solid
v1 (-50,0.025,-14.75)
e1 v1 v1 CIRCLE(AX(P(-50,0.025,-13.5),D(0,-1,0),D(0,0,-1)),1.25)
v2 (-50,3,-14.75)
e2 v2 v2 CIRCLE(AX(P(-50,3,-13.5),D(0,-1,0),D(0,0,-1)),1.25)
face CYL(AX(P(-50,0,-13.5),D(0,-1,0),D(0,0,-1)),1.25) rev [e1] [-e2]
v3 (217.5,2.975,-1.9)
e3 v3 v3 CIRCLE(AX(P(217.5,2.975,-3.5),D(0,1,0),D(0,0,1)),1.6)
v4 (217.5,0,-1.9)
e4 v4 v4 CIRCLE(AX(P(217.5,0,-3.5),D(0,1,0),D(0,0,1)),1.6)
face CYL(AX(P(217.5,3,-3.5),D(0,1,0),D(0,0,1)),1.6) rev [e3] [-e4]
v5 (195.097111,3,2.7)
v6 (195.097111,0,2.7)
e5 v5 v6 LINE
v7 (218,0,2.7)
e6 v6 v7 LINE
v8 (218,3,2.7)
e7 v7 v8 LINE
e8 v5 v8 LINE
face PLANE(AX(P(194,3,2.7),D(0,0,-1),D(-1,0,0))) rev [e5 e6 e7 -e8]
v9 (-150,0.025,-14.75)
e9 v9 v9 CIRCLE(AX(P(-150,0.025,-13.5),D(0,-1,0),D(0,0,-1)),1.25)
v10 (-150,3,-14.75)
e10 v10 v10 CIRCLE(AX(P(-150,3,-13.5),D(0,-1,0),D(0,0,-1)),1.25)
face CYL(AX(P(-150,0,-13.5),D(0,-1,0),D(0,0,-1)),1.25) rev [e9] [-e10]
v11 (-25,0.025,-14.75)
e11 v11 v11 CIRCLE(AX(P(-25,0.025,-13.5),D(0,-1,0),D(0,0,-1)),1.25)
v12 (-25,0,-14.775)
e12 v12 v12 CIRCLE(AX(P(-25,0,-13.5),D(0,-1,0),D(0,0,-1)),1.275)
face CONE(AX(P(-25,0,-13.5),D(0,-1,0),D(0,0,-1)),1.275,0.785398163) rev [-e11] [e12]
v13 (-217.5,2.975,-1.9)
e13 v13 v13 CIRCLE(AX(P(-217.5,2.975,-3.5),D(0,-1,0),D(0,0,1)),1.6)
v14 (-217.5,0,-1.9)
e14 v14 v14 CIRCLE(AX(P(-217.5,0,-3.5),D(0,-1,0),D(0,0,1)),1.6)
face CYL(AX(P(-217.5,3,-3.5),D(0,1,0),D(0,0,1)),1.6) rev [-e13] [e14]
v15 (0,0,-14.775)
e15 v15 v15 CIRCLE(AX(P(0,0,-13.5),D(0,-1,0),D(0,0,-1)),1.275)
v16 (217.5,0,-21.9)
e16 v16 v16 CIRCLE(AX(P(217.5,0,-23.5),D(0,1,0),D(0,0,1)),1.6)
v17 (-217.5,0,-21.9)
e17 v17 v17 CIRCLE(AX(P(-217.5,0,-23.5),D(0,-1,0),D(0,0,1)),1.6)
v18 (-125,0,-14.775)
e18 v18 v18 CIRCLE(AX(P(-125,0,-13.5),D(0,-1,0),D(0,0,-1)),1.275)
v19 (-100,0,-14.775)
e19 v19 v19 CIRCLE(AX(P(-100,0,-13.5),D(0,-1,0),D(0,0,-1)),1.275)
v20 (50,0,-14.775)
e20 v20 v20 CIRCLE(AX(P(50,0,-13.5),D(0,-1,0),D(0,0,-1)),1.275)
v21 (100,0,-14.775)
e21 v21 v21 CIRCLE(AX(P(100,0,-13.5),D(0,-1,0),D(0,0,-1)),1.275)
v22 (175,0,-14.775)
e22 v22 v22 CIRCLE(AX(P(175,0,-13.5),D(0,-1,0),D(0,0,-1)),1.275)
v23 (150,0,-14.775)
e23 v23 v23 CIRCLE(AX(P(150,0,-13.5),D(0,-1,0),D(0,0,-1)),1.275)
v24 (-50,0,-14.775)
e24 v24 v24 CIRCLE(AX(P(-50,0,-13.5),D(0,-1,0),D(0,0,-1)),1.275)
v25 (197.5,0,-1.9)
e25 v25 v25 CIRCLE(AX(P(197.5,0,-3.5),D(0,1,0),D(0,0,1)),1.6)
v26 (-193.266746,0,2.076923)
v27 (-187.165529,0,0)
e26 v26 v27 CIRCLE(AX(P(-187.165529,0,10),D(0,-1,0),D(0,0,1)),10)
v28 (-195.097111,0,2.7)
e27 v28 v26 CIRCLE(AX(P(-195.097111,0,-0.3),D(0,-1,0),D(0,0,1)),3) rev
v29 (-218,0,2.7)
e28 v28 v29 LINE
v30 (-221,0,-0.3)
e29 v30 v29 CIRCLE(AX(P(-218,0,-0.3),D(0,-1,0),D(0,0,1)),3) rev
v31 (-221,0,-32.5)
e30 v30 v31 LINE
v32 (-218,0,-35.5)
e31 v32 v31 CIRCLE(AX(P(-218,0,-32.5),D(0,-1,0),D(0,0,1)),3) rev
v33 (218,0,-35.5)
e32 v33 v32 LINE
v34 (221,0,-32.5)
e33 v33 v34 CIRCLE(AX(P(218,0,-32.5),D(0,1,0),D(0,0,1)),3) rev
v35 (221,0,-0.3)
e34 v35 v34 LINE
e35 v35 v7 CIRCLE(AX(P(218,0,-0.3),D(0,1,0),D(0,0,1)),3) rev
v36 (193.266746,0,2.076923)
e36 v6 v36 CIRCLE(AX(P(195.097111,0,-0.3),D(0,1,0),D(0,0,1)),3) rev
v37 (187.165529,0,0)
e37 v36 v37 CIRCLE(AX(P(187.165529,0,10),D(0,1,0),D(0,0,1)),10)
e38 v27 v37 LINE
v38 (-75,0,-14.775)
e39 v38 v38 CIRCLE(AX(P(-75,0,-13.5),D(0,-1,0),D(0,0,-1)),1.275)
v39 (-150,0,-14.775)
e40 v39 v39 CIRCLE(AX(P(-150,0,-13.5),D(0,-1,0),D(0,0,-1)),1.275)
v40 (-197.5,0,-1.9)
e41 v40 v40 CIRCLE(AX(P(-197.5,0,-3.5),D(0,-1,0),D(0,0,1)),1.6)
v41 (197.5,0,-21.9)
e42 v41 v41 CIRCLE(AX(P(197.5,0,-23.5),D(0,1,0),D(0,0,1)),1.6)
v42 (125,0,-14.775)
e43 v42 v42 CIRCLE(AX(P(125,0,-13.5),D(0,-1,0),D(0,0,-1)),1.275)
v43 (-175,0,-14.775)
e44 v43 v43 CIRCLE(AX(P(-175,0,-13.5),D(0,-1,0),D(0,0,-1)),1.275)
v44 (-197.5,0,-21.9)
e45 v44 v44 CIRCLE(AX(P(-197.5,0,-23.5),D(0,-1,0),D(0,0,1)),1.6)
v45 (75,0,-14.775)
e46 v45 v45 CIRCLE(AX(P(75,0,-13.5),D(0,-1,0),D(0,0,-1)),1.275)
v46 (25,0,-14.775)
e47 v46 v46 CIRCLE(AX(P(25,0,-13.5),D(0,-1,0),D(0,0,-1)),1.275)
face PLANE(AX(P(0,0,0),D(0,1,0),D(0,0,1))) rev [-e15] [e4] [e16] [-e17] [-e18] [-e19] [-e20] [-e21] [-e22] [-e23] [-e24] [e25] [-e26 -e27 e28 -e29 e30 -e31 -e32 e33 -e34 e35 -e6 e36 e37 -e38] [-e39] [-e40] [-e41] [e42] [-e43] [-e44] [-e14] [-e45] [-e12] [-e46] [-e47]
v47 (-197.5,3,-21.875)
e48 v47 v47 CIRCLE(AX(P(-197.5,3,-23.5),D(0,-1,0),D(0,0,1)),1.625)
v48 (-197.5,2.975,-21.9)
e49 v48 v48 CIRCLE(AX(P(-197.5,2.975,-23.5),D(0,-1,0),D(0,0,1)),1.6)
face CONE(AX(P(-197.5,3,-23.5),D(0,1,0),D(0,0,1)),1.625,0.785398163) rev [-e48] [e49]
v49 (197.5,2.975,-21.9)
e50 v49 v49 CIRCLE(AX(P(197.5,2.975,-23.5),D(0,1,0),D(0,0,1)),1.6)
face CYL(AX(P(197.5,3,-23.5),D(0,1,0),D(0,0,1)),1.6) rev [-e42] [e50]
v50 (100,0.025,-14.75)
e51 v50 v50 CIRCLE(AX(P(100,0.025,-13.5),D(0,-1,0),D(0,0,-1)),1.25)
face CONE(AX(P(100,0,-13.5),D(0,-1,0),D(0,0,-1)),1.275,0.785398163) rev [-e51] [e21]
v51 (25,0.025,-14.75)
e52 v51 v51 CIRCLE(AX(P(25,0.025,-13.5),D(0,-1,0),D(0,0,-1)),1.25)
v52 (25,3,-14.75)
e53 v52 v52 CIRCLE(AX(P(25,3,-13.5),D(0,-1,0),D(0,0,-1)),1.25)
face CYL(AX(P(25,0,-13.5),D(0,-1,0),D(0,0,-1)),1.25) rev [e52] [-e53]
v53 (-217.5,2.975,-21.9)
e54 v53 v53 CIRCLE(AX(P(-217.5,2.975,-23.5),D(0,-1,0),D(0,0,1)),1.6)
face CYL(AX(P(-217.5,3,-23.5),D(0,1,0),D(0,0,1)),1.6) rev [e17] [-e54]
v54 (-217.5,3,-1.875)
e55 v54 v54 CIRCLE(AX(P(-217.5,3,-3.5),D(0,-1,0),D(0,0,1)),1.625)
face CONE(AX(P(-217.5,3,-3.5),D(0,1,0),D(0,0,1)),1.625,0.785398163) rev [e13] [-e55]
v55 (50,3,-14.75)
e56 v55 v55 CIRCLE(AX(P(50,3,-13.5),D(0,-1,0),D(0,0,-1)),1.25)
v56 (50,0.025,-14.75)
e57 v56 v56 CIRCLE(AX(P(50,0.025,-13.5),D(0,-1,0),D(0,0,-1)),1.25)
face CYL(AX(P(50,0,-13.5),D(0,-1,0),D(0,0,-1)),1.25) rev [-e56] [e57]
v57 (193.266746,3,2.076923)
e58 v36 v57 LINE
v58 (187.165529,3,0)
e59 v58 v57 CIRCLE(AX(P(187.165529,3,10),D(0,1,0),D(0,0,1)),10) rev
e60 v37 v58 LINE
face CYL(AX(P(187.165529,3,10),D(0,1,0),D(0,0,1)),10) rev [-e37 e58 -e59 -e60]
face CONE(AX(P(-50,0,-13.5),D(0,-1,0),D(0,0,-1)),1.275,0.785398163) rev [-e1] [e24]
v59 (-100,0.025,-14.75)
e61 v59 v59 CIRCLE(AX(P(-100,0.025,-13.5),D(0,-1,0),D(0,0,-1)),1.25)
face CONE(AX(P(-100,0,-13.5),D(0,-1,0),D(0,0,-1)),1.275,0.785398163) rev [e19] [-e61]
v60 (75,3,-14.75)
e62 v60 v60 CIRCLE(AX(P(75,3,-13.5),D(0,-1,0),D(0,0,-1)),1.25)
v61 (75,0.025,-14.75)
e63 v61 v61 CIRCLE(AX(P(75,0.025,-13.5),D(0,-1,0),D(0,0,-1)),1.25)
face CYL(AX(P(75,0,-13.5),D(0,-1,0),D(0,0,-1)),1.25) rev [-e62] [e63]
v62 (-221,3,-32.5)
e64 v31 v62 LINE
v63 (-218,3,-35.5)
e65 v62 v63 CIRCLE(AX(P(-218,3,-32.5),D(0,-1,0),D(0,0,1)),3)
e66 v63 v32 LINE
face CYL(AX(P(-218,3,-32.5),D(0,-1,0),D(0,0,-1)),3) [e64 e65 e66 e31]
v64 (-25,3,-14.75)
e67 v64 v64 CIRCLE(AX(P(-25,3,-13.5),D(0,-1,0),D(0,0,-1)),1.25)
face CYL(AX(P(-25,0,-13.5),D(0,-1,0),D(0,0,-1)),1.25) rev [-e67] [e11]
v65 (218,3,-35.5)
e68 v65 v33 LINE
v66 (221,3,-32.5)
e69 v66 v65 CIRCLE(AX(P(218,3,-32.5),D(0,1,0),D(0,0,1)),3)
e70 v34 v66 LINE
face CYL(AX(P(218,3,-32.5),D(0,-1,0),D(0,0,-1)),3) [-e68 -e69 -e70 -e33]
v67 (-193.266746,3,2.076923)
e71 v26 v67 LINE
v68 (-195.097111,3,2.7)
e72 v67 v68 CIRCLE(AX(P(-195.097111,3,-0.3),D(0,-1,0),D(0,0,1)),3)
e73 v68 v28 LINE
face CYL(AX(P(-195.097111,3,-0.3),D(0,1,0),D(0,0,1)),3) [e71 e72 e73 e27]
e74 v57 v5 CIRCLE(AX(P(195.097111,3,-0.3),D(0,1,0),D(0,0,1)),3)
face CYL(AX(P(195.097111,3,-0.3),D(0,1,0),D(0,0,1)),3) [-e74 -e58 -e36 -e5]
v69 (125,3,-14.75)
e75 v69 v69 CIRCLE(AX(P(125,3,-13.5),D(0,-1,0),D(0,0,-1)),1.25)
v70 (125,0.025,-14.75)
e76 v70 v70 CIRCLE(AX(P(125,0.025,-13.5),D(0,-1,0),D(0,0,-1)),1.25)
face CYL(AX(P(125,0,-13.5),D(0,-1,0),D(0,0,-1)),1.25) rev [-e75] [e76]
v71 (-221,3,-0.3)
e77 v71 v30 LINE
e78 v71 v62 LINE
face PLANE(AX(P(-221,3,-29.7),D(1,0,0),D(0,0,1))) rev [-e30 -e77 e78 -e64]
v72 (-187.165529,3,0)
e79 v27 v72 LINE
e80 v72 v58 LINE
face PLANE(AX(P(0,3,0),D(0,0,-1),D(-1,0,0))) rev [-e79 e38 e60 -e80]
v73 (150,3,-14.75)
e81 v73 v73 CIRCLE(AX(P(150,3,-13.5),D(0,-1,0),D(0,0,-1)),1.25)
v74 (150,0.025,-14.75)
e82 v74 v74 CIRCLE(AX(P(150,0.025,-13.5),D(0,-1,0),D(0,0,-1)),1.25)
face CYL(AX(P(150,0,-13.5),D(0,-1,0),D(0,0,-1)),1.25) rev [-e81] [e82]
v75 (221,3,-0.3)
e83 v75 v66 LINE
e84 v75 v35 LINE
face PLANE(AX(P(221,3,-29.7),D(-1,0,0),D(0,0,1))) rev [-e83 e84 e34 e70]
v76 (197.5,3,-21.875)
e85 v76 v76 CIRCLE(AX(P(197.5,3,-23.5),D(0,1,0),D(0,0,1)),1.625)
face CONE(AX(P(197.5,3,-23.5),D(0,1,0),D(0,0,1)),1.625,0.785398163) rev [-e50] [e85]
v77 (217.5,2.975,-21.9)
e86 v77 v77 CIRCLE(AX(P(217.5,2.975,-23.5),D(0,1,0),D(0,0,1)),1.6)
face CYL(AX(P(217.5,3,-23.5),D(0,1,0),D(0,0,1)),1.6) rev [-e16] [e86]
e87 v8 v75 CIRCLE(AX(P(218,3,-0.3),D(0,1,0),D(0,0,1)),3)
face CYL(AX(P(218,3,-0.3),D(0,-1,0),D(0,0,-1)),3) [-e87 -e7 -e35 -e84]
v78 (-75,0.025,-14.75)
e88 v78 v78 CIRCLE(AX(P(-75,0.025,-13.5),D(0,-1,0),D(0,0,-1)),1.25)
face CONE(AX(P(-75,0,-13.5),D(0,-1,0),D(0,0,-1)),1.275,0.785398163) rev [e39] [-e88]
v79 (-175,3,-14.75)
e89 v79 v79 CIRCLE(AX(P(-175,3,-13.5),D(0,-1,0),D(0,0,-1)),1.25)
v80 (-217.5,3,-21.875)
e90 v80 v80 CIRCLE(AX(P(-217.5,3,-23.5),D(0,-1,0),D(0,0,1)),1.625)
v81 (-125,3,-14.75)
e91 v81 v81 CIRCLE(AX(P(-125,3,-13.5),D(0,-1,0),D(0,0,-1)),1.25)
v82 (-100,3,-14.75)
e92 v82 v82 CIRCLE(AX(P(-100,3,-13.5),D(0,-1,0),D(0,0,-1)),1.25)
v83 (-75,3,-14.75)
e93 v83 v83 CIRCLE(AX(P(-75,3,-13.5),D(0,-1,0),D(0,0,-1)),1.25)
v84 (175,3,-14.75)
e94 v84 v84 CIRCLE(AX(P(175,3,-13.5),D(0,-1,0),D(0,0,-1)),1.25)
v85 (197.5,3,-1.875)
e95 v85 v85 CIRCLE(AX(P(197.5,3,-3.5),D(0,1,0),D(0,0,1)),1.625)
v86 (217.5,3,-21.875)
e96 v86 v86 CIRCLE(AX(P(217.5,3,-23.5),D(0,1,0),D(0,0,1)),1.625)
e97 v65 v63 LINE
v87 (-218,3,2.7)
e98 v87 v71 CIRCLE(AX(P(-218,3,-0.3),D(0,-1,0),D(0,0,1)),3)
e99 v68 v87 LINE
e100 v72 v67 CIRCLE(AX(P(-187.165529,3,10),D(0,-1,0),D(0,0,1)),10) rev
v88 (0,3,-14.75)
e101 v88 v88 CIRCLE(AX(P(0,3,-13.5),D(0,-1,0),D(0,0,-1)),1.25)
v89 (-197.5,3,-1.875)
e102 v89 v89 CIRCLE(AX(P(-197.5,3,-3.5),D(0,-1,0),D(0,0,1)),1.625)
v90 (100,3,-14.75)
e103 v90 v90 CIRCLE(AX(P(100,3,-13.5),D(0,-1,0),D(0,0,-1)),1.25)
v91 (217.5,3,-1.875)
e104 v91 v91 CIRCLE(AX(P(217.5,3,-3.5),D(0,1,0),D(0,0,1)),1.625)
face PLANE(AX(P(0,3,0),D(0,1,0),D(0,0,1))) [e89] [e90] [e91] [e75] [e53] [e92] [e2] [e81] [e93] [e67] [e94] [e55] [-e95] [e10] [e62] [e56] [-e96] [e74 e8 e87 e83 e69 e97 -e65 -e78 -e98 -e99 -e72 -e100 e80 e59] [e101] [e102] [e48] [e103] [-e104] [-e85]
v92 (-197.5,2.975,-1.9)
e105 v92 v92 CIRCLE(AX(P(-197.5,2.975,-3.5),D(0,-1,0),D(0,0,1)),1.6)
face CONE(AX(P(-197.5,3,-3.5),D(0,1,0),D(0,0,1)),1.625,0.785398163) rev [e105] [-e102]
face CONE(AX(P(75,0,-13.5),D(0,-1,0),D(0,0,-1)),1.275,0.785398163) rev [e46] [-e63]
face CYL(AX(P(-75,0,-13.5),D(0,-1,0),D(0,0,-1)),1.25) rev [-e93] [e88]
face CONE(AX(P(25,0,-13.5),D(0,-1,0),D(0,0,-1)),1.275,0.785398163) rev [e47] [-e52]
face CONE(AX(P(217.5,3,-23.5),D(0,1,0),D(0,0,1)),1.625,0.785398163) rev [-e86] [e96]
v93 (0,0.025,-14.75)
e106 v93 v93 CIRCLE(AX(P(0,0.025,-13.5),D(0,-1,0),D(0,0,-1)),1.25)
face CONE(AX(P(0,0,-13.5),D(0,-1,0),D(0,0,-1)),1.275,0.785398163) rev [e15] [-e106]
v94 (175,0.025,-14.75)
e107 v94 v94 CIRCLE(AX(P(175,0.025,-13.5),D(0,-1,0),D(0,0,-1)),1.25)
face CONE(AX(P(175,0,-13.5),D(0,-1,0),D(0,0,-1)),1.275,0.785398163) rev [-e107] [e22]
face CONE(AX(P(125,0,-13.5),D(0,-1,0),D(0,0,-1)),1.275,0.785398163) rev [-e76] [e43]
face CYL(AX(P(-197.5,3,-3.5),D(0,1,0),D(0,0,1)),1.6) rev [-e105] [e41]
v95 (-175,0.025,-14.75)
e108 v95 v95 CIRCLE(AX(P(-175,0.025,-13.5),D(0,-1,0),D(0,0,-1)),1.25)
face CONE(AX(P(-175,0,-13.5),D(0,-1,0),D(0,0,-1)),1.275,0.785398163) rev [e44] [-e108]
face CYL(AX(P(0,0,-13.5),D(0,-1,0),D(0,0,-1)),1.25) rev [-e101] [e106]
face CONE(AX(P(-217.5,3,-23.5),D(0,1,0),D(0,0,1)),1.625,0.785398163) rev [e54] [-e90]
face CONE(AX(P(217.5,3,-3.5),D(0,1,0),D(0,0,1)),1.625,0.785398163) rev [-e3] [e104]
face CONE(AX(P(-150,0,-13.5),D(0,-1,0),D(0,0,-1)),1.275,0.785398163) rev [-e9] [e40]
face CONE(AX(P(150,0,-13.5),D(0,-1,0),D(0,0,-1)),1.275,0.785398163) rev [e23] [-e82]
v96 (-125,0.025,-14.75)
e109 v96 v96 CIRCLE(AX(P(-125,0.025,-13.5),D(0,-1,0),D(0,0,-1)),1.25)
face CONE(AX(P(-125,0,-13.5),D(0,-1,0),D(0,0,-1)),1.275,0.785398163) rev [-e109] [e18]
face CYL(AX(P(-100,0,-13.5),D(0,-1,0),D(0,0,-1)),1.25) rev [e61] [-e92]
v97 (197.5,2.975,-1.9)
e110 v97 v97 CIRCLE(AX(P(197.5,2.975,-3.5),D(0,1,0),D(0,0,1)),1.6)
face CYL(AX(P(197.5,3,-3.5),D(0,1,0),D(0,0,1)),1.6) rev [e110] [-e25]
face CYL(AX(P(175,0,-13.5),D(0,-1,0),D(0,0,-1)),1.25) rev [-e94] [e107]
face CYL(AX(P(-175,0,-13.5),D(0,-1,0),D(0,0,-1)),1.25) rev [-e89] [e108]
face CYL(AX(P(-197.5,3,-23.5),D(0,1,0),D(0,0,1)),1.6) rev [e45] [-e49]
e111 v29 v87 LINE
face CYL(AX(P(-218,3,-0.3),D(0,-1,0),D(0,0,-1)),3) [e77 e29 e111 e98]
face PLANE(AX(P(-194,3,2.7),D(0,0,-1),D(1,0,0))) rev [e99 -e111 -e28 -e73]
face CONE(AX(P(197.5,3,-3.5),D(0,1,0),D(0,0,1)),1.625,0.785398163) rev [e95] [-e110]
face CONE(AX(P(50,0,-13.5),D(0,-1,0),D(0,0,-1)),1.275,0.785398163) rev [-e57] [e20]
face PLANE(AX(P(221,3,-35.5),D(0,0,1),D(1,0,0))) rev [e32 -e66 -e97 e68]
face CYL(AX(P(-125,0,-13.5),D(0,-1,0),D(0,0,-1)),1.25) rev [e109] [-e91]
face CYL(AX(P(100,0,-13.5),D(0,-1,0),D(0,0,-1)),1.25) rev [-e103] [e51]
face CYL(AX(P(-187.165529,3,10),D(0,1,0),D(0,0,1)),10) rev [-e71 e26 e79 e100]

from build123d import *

# Parameters (mm, degrees)
BOSS_EXTRUDE1_DEPTH                   = 3
M3_CLEARANCE_HOLE1_D                  = 3.2
M3_CLEARANCE_HOLE1_CSINK_D            = 3.25
M3_CLEARANCE_HOLE1_CSINK_ANGLE        = 90
FILLET1_R                             = 10
FILLET2_R                             = 3
TAP_DRILL_FOR_M3X0_5_TAP2_D           = 2.5
TAP_DRILL_FOR_M3X0_5_TAP2_CSINK_D     = 2.55
TAP_DRILL_FOR_M3X0_5_TAP2_CSINK_ANGLE = 90
LPATTERN1_COUNT                       = 15
LPATTERN1_PITCH                       = 25


with BuildPart() as part:
    # Sketch1 → Boss-Extrude1 (new body)
    with BuildSketch(Plane(origin=(0, 0, 0), x_dir=(1, 0, 0), z_dir=(0, 1, 0))):
        Polygon((0, 0), (194, 0), (194, -2.7), (221, -2.7), (221, 29.7), (221, 35.5), (0, 35.5), (0, 29.7), align=None)
    extrude(amount=BOSS_EXTRUDE1_DEPTH)

    # M3 Clearance Hole1 (through all)
    with Locations(Plane(origin=(0, 3, 0), x_dir=(1, 0, 0), z_dir=(0, 1, 0))):
        with Locations((197.5, 23.5), (217.5, 3.5), (217.5, 23.5), (197.5, 3.5)):
            CounterSinkHole(M3_CLEARANCE_HOLE1_D / 2, M3_CLEARANCE_HOLE1_CSINK_D / 2, counter_sink_angle=M3_CLEARANCE_HOLE1_CSINK_ANGLE)

    # Fillet1
    # the kernel refuses this fillet: 10 mm, written as the material it adds along each edge
    with BuildSketch(Plane(origin=(194, 0, 0), x_dir=(-1, 0, 0), z_dir=(0, 1, 0))) as fillet1_piece_1:
        with BuildLine():
            CenterArc((6.83447145, 10), FILLET1_R, 226.886394054, 43.113605946)
            Line((0, 2.7), (-0.136689429, 2.554))
            ThreePointArc((-0.136689429, 2.554), (-0.2, 1.35), (-0.2, 0))
            Line((-0.2, 0), (0, -0.2))
            Line((0, -0.2), (6.83447145, -0.2))
            Line((6.83447145, -0.2), (6.83447145, 0))
        make_face()
    extrude(amount=3)

    # Fillet2
    fillet2_edges = [part.edges().sort_by_distance(p)[0] for p in [
        (221, 1.5, -35.5),
        (221, 1.5, 2.7),
        (194, 1.5, 2.7),
    ]]
    fillet(fillet2_edges, radius=FILLET2_R)

    # Mirror1: part across plane


with BuildPart() as part_1:
    add(part.part)
    add(part.part.mirror(Plane(origin=(0, 3, -35.5), x_dir=(0, 0, 1), z_dir=(1, 0, 0))))

    # Tap Drill for M3x0.5 Tap2 (through all)
    with Locations(Plane(origin=(0, 0, 0), x_dir=(-1, 0, 0), z_dir=(0, -1, 0))):
        with Locations((-175, 13.5)):
            tap_drill_for_m3x0_5_tap2 = CounterSinkHole(TAP_DRILL_FOR_M3X0_5_TAP2_D / 2, TAP_DRILL_FOR_M3X0_5_TAP2_CSINK_D / 2, counter_sink_angle=TAP_DRILL_FOR_M3X0_5_TAP2_CSINK_ANGLE)

    # LPattern1: Tap Drill for M3x0.5 Tap2 ×15
    with Locations(*[(-i * LPATTERN1_PITCH, 0, 0) for i in range(1, LPATTERN1_COUNT)]):
        add(tap_drill_for_m3x0_5_tap2, mode=Mode.SUBTRACT)


solid = part_1.part
